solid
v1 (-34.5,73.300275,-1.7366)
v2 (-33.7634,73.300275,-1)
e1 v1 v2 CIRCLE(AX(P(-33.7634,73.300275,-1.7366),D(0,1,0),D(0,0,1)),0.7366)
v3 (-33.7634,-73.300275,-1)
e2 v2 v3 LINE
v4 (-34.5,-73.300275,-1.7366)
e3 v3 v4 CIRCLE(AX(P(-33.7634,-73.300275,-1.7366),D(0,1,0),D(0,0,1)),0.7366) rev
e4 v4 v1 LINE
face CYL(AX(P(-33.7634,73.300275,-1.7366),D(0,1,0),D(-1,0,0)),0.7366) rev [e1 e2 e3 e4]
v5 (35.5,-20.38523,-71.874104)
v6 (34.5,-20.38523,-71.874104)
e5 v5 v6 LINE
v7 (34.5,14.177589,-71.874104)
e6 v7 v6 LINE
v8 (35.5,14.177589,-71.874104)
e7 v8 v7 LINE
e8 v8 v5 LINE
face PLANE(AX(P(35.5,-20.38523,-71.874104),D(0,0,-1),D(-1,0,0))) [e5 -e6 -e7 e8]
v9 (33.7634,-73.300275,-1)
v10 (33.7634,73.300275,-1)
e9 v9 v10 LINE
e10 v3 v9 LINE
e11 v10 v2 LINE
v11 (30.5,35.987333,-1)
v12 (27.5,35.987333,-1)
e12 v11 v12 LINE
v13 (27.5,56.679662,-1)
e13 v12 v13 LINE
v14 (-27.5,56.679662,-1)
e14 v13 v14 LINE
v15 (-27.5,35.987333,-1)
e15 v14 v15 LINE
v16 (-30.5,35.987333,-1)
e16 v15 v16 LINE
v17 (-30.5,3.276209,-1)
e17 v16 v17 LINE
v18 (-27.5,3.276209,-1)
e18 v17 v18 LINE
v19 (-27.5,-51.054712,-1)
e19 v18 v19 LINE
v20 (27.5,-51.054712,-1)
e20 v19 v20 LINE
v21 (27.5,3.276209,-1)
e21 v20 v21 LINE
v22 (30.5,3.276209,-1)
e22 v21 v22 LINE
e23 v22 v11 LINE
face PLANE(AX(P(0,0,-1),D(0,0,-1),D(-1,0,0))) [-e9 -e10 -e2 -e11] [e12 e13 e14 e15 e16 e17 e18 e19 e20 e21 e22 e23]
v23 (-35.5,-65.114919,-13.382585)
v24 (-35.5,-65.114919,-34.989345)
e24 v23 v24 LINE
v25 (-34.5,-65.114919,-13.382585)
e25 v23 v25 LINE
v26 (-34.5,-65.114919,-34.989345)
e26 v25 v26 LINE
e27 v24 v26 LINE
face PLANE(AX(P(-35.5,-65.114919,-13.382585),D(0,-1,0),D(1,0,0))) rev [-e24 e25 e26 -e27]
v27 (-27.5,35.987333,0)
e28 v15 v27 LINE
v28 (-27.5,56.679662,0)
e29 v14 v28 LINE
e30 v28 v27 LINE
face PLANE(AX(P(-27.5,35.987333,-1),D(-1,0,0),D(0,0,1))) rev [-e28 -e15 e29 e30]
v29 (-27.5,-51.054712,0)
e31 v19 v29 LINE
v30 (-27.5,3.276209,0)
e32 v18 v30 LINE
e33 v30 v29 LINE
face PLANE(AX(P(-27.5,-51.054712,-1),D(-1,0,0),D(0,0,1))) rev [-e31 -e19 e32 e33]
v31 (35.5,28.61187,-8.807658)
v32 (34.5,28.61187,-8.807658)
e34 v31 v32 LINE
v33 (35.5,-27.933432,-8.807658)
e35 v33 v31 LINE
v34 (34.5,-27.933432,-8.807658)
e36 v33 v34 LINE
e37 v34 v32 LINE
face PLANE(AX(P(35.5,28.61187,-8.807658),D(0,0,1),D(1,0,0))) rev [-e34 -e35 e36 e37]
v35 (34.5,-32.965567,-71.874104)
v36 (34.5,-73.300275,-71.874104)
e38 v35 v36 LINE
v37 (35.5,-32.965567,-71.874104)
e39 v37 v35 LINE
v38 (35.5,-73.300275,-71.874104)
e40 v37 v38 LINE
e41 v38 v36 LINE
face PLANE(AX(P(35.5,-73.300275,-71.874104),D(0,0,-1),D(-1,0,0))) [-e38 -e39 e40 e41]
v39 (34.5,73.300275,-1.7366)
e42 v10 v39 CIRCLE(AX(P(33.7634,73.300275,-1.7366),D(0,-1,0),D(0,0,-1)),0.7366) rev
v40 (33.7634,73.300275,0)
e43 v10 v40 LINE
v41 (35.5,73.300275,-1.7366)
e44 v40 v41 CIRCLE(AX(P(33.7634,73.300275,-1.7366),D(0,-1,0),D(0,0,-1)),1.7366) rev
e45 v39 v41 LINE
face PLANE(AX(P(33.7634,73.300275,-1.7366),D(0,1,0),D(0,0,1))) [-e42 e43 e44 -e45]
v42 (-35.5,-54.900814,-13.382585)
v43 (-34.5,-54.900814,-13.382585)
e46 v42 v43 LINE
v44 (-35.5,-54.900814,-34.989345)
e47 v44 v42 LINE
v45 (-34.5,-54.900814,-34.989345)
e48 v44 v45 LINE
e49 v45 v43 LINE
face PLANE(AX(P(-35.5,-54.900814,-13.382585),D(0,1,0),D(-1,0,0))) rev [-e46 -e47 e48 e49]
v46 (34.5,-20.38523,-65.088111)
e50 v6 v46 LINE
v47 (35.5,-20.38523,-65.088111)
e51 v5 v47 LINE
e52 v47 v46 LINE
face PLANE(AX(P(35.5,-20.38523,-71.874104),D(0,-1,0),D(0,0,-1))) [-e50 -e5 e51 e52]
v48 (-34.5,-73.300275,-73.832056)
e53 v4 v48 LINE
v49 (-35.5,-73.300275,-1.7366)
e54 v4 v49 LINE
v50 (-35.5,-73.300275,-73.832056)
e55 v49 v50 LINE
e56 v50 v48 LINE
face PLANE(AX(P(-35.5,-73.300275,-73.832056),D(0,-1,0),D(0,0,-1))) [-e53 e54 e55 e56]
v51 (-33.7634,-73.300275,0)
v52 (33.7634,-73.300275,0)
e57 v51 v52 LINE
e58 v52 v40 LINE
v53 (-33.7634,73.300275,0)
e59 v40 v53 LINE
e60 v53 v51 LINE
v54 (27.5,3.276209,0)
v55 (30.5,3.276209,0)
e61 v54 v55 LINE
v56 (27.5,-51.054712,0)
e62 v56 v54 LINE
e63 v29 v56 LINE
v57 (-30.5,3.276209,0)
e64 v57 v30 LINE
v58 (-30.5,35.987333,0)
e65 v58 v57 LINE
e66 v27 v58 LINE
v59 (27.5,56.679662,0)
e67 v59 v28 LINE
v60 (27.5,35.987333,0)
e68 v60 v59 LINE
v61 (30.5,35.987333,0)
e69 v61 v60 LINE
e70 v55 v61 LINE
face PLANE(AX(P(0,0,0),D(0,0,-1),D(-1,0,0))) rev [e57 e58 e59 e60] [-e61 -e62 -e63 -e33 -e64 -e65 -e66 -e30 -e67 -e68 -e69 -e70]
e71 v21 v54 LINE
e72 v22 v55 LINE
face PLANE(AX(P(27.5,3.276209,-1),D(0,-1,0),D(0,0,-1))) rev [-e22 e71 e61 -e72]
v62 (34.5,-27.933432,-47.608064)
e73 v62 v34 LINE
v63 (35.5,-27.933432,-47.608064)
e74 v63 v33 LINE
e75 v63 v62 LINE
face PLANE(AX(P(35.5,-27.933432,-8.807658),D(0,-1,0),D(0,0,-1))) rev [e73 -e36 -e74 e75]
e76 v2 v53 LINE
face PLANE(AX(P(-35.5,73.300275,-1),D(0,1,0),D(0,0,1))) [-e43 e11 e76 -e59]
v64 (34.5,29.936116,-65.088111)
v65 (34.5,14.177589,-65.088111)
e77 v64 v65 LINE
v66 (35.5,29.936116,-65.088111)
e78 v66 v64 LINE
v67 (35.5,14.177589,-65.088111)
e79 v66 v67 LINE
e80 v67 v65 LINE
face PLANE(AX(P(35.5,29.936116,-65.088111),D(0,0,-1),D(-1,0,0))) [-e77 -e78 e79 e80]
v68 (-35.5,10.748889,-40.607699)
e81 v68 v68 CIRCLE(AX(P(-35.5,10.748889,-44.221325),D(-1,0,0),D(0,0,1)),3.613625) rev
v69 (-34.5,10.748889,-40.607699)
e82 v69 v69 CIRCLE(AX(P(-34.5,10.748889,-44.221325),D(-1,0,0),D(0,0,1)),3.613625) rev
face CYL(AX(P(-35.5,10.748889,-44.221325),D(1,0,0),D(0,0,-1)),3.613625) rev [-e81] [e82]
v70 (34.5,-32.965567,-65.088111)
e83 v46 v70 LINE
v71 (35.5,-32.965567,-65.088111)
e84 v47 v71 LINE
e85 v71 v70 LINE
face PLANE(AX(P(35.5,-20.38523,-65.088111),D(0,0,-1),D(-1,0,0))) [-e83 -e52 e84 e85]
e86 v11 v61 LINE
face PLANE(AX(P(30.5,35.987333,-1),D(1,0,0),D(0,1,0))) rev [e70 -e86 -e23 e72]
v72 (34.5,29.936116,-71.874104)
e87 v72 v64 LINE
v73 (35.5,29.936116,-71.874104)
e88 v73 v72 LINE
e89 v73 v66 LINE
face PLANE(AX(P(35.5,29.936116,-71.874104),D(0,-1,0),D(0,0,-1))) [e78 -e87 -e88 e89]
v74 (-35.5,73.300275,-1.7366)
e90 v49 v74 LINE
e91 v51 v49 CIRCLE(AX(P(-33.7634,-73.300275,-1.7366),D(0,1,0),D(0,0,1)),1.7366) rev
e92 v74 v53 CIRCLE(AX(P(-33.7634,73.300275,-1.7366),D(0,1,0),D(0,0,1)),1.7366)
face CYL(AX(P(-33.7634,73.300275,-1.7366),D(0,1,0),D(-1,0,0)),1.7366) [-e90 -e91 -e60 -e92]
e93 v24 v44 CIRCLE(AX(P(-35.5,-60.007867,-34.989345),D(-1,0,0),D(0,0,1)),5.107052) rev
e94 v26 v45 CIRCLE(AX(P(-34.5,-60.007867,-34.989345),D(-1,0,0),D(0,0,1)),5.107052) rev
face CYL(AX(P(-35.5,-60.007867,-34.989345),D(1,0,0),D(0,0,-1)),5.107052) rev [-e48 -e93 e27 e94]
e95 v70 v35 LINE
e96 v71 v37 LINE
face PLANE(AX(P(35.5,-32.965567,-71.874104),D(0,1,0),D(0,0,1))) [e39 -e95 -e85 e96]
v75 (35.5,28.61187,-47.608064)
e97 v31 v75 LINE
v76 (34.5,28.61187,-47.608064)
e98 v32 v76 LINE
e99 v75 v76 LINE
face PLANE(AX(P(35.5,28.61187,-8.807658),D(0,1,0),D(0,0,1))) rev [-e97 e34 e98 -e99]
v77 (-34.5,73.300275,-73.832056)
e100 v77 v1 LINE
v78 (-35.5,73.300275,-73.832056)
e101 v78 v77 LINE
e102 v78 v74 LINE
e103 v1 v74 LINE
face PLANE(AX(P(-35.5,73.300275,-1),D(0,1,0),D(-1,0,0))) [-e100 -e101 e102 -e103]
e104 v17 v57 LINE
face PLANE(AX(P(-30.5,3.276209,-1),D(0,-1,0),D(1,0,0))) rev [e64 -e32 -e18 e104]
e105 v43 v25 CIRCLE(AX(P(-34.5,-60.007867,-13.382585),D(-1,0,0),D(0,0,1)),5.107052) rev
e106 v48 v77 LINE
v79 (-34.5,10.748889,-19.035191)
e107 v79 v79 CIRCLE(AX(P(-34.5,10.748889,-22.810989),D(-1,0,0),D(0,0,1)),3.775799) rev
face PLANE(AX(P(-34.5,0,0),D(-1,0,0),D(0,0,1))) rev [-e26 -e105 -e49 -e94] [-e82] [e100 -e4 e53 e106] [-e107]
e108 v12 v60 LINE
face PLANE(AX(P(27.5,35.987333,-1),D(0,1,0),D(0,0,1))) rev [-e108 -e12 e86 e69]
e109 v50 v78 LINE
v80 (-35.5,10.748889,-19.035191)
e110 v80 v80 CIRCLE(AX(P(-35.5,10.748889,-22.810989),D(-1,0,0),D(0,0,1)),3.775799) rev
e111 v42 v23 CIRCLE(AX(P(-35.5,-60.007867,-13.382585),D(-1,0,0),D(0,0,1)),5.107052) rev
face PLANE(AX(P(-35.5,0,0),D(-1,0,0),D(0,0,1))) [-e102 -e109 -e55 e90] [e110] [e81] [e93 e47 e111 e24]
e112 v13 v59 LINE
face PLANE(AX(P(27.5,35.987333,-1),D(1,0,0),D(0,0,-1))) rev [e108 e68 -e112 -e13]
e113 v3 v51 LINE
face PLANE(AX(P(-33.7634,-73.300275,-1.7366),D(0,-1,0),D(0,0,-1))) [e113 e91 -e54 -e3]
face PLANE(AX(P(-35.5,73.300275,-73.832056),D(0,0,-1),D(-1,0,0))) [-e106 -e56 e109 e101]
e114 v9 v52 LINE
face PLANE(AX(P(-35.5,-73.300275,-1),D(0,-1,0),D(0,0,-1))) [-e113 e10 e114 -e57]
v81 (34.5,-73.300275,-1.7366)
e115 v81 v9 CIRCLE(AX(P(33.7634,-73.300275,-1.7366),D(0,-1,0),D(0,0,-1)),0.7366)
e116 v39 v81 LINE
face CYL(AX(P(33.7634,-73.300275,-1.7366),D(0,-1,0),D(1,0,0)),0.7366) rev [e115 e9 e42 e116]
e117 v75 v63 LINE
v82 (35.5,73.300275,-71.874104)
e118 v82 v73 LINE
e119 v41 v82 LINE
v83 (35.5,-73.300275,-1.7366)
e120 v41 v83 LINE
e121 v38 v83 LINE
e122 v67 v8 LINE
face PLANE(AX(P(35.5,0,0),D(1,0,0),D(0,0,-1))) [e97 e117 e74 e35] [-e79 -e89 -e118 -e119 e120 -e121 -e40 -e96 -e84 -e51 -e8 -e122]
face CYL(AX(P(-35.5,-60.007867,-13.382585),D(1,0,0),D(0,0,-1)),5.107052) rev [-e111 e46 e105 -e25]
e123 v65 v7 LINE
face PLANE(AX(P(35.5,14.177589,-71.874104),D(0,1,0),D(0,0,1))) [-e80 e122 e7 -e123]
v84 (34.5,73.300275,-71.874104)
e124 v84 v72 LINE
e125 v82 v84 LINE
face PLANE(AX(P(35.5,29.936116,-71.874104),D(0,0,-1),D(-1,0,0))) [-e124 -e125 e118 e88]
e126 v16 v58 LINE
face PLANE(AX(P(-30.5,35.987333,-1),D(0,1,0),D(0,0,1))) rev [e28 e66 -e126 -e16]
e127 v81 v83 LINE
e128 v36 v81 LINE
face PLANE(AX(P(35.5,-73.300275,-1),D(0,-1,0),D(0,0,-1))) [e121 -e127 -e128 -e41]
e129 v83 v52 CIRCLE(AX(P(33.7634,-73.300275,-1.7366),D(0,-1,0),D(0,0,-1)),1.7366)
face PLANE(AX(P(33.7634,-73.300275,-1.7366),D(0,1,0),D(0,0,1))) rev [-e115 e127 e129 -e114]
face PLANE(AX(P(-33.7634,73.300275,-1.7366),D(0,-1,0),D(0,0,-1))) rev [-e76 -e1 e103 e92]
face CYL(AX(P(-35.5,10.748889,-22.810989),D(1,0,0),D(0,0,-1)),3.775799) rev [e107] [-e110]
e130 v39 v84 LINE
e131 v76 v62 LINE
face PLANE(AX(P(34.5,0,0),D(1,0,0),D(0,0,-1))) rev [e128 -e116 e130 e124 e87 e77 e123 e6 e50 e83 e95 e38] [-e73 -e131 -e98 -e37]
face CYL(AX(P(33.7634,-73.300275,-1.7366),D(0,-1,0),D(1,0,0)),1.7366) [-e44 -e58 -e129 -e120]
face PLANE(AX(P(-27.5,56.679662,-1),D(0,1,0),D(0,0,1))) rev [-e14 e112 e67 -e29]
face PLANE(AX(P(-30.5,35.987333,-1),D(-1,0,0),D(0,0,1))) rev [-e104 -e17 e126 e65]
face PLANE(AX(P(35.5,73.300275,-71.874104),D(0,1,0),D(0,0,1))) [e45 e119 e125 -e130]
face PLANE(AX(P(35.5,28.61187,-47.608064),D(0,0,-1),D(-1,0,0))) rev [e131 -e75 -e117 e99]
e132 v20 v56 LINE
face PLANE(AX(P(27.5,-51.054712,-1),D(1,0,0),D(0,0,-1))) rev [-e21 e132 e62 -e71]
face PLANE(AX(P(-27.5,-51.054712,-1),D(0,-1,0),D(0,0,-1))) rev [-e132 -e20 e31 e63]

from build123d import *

# Parameters (mm, degrees)
BASE_FLANGE1_START             = -1
BASE_FLANGE1_OUTLINE_W         = 71
BASE_FLANGE1_OUTLINE_H         = 146.600550732
BASE_FLANGE1_DEPTH             = 1
EDGE_FLANGE1_STRIP_W           = 5.4732
EDGE_FLANGE1_STRIP_H           = 1
EDGE_FLANGE1_STRIP_CUT_DEPTH   = 146.600550732
EDGE_FLANGE1_STRIP_2_W         = 5.4732
EDGE_FLANGE1_STRIP_2_H         = 1
EDGE_FLANGE1_STRIP_CUT_2_DEPTH = 146.600550732
EDGE_FLANGE1_DEPTH             = 146.600550732
EDGE_FLANGE1_PROFILE_W         = 56.545302405
EDGE_FLANGE1_PROFILE_H         = 38.800406569
EDGE_FLANGE1_FLAT_DEPTH        = 1
EDGE_FLANGE1_BEND_DEPTH        = 146.600550732
EDGE_FLANGE1_PROFILE_2_W       = 146.600550732
EDGE_FLANGE1_PROFILE_2_H       = 72.095455735
EDGE_FLANGE1_PROFILE_2_R       = 3.775798506
EDGE_FLANGE1_PROFILE_2_R_2     = 3.613625218
EDGE_FLANGE1_FLAT_2_DEPTH      = 1


# Read off the part's stored shape, not the designer's step: Base-Flange1
# Sheet-metal steps are written as plain solids
with BuildPart() as part:
    # Base-Flange1 outline → Base-Flange1 (new body)
    with BuildSketch(Plane.XY.offset(BASE_FLANGE1_START)):
        Rectangle(BASE_FLANGE1_OUTLINE_W, BASE_FLANGE1_OUTLINE_H)
        Polygon((27.5, 56.679661992), (27.5, 35.987332772), (30.5, 35.987332772), (30.5, 3.276208649), (27.5, 3.276208649), (27.5, -51.054712488), (-27.5, -51.054712488), (-27.5, 3.276208649), (-30.5, 3.276208649), (-30.5, 35.987332772), (-27.5, 35.987332772), (-27.5, 56.679661992), align=None, mode=Mode.SUBTRACT)
    extrude(amount=BASE_FLANGE1_DEPTH)

    # Edge-Flange1 strip (across the edge) → Edge-Flange1 strip cut (cut)
    with BuildSketch(Plane(origin=(35.5, 73.300275366, -1), x_dir=(-1, 0, 0), z_dir=(0, -1, 0))):
        with Locations((-1, -0.5)):
            Rectangle(EDGE_FLANGE1_STRIP_W, EDGE_FLANGE1_STRIP_H)
    extrude(amount=EDGE_FLANGE1_STRIP_CUT_DEPTH, mode=Mode.SUBTRACT)

    # Edge-Flange1 strip 2 (across the edge) → Edge-Flange1 strip cut 2 (cut)
    with BuildSketch(Plane(origin=(-35.5, -73.300275366, -1), x_dir=(1, 0, 0), z_dir=(0, 1, 0))):
        with Locations((-1, -0.5)):
            Rectangle(EDGE_FLANGE1_STRIP_2_W, EDGE_FLANGE1_STRIP_2_H)
    extrude(amount=EDGE_FLANGE1_STRIP_CUT_2_DEPTH, mode=Mode.SUBTRACT)

    # Edge-Flange1 bend section (across the edge) → Edge-Flange1 (add)
    with BuildSketch(Plane(origin=(35.5, 73.300275366, -1), x_dir=(-1, 0, 0), z_dir=(0, -1, 0))):
        with BuildLine():
            Line((0, 0.7366), (1, 0.7366))
            ThreePointArc((1, 0.7366), (1.215745145, 0.215745145), (1.7366, 0))
            Line((1.7366, 0), (1.7366, -1))
            ThreePointArc((1.7366, -1), (0.508638364, -0.491361636), (0, 0.7366))
        make_face()
    extrude(amount=EDGE_FLANGE1_DEPTH)

    # Edge-Flange1 profile (on flange) → Edge-Flange1 flat (add)
    with BuildSketch(Plane(origin=(35.5, 0, -1), x_dir=(0, 1, 0), z_dir=(-1, 0, 0))):
        Polygon((-20.385230208, 70.874104098), (-20.385230208, 64.088111139), (-32.965566809, 64.088111139), (-32.965566809, 70.874104098), (-73.300275366, 70.874104098), (-73.300275366, 0.7366), (73.300275366, 0.7366), (73.300275366, 70.874104098), (29.936116194, 70.874104098), (29.936116194, 64.088111139), (14.177589294, 64.088111139), (14.177589294, 70.874104098), align=None)
        with Locations((0.339219033, 27.20786121)):
            Rectangle(EDGE_FLANGE1_PROFILE_W, EDGE_FLANGE1_PROFILE_H, mode=Mode.SUBTRACT)
    extrude(amount=EDGE_FLANGE1_FLAT_DEPTH)

    # Edge-Flange1 bend section 2 (across the edge) → Edge-Flange1 bend (add)
    with BuildSketch(Plane(origin=(-35.5, -73.300275366, -1), x_dir=(1, 0, 0), z_dir=(0, 1, 0))):
        with BuildLine():
            Line((0, 0.7366), (1, 0.7366))
            ThreePointArc((1, 0.7366), (1.215745145, 0.215745145), (1.7366, 0))
            Line((1.7366, 0), (1.7366, -1))
            ThreePointArc((1.7366, -1), (0.508638364, -0.491361636), (0, 0.7366))
        make_face()
    extrude(amount=EDGE_FLANGE1_BEND_DEPTH)

    # Edge-Flange1 profile 2 (on flange) → Edge-Flange1 flat 2 (add)
    with BuildSketch(Plane(origin=(-35.5, 0, -1), x_dir=(0, -1, 0), z_dir=(1, 0, 0))):
        with Locations((0, 36.784327868)):
            Rectangle(EDGE_FLANGE1_PROFILE_2_W, EDGE_FLANGE1_PROFILE_2_H)
        with BuildLine():
            ThreePointArc((65.114919352, 12.382584554), (60.007866854, 7.275532056), (54.900814356, 12.382584554))
            Line((54.900814356, 12.382584554), (54.900814356, 33.989345124))
            ThreePointArc((54.900814356, 33.989345124), (60.007866854, 39.096397622), (65.114919352, 33.989345124))
            Line((65.114919352, 33.989345124), (65.114919352, 12.382584554))
        make_face(mode=Mode.SUBTRACT)
        with Locations((-10.748889417, 21.810989166)):
            Circle(EDGE_FLANGE1_PROFILE_2_R, mode=Mode.SUBTRACT)
        with Locations((-10.748889417, 43.22132464)):
            Circle(EDGE_FLANGE1_PROFILE_2_R_2, mode=Mode.SUBTRACT)
    extrude(amount=EDGE_FLANGE1_FLAT_2_DEPTH)


solid = part.part
